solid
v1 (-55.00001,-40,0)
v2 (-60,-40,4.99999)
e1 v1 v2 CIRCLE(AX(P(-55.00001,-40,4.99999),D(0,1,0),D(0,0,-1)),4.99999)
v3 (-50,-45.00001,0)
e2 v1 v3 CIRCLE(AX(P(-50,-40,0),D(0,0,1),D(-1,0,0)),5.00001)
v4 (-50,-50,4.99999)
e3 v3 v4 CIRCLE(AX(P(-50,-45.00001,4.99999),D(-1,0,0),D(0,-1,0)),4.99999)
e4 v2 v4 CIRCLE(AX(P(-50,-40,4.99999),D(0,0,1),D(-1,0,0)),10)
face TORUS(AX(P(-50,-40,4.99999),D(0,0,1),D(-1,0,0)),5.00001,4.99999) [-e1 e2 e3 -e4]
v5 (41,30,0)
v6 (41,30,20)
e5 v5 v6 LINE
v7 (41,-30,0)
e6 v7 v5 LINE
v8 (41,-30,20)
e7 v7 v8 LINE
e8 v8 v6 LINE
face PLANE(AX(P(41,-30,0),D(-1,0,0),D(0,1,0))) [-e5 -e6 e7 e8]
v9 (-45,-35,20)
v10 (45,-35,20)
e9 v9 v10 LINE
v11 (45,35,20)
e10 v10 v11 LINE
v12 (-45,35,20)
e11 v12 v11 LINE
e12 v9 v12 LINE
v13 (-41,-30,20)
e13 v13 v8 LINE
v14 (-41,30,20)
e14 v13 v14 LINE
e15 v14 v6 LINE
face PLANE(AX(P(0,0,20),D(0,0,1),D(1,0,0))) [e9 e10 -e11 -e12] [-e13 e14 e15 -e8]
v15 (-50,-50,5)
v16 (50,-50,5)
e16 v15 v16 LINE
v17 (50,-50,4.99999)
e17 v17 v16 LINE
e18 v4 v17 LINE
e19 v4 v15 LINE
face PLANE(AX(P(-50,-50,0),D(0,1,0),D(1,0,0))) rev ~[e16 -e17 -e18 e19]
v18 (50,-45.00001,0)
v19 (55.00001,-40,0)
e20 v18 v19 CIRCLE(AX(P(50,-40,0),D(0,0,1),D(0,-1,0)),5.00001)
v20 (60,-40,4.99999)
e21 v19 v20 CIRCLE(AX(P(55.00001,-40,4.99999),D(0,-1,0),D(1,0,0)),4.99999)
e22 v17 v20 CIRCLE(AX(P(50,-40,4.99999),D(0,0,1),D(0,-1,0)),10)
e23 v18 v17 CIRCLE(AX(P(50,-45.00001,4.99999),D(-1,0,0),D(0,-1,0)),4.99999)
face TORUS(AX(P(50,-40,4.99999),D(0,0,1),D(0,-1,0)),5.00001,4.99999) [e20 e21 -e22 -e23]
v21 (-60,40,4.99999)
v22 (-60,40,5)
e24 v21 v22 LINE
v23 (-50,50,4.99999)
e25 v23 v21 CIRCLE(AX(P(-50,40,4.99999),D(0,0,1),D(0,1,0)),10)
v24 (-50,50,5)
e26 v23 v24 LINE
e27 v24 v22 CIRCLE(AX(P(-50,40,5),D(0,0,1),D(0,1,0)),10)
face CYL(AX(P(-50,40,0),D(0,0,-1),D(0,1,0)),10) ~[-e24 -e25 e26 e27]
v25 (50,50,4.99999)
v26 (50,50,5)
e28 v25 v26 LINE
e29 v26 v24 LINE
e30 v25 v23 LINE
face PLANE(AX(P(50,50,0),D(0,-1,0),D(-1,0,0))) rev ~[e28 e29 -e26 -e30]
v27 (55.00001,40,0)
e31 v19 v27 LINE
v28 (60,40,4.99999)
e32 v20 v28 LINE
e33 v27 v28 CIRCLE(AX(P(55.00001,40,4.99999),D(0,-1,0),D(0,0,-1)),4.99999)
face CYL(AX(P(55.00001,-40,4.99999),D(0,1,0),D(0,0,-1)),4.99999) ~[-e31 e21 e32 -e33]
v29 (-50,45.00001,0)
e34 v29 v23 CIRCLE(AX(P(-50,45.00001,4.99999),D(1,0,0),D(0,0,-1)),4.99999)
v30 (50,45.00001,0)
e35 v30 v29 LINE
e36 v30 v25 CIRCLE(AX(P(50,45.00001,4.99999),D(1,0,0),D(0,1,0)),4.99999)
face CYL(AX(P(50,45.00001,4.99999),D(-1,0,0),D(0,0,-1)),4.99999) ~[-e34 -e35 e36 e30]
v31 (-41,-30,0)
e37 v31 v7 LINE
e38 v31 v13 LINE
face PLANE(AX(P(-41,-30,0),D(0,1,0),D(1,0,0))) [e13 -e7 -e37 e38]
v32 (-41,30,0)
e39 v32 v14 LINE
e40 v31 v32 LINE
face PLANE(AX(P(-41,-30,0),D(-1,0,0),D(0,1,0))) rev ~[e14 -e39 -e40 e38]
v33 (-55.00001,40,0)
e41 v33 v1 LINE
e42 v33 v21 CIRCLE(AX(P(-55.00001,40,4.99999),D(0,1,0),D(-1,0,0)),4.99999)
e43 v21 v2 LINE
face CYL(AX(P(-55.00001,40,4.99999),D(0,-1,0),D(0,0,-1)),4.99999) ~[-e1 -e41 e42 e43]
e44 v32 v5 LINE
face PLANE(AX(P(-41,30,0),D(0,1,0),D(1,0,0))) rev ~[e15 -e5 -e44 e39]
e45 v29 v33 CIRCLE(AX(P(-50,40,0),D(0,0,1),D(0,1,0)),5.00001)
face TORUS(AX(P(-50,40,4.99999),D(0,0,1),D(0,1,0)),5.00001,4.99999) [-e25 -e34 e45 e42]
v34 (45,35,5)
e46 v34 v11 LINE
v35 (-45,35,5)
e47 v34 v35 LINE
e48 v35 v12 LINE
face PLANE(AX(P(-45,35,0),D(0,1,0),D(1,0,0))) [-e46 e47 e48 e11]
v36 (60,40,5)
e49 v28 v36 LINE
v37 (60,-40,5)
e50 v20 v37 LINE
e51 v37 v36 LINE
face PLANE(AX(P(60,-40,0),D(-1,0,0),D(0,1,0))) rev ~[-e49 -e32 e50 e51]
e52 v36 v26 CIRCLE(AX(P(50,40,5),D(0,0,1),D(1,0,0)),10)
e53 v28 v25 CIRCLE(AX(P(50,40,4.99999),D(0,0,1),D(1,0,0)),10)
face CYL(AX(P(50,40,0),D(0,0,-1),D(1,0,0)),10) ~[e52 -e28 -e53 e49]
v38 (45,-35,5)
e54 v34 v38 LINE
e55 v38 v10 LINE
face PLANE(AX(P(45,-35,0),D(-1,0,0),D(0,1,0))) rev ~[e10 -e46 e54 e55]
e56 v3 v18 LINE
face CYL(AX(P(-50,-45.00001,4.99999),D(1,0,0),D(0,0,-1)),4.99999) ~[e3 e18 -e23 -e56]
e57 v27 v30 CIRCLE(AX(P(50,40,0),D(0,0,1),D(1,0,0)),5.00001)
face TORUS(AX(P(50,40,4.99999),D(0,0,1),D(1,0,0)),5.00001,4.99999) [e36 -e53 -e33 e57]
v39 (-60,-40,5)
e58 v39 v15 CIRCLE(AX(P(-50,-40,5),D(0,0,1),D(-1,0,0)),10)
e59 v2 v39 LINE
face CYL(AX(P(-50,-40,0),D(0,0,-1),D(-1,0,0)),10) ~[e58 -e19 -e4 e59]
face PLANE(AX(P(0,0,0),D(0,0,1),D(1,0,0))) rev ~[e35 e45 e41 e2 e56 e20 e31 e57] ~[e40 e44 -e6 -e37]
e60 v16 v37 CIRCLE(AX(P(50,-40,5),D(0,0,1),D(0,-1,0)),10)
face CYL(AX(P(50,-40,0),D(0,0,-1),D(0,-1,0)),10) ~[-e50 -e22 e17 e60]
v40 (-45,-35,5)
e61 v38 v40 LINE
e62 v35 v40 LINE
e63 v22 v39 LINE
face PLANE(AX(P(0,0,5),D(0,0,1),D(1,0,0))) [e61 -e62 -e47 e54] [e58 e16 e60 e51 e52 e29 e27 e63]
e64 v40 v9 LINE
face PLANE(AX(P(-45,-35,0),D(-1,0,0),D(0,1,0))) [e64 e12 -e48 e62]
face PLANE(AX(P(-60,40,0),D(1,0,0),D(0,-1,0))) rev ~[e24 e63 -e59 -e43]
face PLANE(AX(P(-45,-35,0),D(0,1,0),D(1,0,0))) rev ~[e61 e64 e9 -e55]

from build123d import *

# Parameters (mm, degrees)
F0_W     = 90
F0_H     = 70
F0_W_2   = 82
F0_H_2   = 60
F1_DEPTH = 5
F2_DEPTH = 20
F3_DEPTH = 20
F4_R     = 4.99999


# Not quite as in the source:
# - a fillet or chamfer is up to 0.001 mm smaller than in the source, because OpenCascade refuses the exact size
# - a feature names something its author has since deleted; it is built from what else it names


with BuildPart() as f1:
    # F0 (on Top) → F1 (new body)
    with BuildSketch(Plane.XY):
        with BuildLine():
            Line((-50, -50), (50, -50))
            ThreePointArc((50, -50), (57.0710678119, -47.0710678119), (60, -40))
            Line((60, -40), (60, 40))
            ThreePointArc((60, 40), (57.0710678119, 47.0710678119), (50, 50))
            Line((50, 50), (-50, 50))
            ThreePointArc((-50, 50), (-57.0710678119, 47.0710678119), (-60, 40))
            Line((-60, 40), (-60, -40))
            ThreePointArc((-60, -40), (-57.0710678119, -47.0710678119), (-50, -50))
        make_face()
        Rectangle(F0_W, F0_H, mode=Mode.SUBTRACT)
        Rectangle(F0_W, F0_H)
        Rectangle(F0_W_2, F0_H_2, mode=Mode.SUBTRACT)
    extrude(amount=F1_DEPTH)

    # F0 (on Top) → F2 (join)
    with BuildSketch(Plane.XY):
        Rectangle(F0_W, F0_H)
        Rectangle(F0_W_2, F0_H_2, mode=Mode.SUBTRACT)
        Rectangle(F0_W_2, F0_H_2)
    extrude(amount=F2_DEPTH)

    # F0 (on Top) → F3 (cut)
    with BuildSketch(Plane.XY):
        Rectangle(F0_W_2, F0_H_2)
    extrude(amount=F3_DEPTH, mode=Mode.SUBTRACT)

    # F4 (radius 5 in the source; OpenCascade refuses exactly that, so slightly less here)
    f4_edges = [f1.edges().sort_by_distance(p)[0] for p in [
        (57.071068, -47.071068, 0),
    ]]
    fillet(f4_edges, radius=F4_R)


solid = f1.part
